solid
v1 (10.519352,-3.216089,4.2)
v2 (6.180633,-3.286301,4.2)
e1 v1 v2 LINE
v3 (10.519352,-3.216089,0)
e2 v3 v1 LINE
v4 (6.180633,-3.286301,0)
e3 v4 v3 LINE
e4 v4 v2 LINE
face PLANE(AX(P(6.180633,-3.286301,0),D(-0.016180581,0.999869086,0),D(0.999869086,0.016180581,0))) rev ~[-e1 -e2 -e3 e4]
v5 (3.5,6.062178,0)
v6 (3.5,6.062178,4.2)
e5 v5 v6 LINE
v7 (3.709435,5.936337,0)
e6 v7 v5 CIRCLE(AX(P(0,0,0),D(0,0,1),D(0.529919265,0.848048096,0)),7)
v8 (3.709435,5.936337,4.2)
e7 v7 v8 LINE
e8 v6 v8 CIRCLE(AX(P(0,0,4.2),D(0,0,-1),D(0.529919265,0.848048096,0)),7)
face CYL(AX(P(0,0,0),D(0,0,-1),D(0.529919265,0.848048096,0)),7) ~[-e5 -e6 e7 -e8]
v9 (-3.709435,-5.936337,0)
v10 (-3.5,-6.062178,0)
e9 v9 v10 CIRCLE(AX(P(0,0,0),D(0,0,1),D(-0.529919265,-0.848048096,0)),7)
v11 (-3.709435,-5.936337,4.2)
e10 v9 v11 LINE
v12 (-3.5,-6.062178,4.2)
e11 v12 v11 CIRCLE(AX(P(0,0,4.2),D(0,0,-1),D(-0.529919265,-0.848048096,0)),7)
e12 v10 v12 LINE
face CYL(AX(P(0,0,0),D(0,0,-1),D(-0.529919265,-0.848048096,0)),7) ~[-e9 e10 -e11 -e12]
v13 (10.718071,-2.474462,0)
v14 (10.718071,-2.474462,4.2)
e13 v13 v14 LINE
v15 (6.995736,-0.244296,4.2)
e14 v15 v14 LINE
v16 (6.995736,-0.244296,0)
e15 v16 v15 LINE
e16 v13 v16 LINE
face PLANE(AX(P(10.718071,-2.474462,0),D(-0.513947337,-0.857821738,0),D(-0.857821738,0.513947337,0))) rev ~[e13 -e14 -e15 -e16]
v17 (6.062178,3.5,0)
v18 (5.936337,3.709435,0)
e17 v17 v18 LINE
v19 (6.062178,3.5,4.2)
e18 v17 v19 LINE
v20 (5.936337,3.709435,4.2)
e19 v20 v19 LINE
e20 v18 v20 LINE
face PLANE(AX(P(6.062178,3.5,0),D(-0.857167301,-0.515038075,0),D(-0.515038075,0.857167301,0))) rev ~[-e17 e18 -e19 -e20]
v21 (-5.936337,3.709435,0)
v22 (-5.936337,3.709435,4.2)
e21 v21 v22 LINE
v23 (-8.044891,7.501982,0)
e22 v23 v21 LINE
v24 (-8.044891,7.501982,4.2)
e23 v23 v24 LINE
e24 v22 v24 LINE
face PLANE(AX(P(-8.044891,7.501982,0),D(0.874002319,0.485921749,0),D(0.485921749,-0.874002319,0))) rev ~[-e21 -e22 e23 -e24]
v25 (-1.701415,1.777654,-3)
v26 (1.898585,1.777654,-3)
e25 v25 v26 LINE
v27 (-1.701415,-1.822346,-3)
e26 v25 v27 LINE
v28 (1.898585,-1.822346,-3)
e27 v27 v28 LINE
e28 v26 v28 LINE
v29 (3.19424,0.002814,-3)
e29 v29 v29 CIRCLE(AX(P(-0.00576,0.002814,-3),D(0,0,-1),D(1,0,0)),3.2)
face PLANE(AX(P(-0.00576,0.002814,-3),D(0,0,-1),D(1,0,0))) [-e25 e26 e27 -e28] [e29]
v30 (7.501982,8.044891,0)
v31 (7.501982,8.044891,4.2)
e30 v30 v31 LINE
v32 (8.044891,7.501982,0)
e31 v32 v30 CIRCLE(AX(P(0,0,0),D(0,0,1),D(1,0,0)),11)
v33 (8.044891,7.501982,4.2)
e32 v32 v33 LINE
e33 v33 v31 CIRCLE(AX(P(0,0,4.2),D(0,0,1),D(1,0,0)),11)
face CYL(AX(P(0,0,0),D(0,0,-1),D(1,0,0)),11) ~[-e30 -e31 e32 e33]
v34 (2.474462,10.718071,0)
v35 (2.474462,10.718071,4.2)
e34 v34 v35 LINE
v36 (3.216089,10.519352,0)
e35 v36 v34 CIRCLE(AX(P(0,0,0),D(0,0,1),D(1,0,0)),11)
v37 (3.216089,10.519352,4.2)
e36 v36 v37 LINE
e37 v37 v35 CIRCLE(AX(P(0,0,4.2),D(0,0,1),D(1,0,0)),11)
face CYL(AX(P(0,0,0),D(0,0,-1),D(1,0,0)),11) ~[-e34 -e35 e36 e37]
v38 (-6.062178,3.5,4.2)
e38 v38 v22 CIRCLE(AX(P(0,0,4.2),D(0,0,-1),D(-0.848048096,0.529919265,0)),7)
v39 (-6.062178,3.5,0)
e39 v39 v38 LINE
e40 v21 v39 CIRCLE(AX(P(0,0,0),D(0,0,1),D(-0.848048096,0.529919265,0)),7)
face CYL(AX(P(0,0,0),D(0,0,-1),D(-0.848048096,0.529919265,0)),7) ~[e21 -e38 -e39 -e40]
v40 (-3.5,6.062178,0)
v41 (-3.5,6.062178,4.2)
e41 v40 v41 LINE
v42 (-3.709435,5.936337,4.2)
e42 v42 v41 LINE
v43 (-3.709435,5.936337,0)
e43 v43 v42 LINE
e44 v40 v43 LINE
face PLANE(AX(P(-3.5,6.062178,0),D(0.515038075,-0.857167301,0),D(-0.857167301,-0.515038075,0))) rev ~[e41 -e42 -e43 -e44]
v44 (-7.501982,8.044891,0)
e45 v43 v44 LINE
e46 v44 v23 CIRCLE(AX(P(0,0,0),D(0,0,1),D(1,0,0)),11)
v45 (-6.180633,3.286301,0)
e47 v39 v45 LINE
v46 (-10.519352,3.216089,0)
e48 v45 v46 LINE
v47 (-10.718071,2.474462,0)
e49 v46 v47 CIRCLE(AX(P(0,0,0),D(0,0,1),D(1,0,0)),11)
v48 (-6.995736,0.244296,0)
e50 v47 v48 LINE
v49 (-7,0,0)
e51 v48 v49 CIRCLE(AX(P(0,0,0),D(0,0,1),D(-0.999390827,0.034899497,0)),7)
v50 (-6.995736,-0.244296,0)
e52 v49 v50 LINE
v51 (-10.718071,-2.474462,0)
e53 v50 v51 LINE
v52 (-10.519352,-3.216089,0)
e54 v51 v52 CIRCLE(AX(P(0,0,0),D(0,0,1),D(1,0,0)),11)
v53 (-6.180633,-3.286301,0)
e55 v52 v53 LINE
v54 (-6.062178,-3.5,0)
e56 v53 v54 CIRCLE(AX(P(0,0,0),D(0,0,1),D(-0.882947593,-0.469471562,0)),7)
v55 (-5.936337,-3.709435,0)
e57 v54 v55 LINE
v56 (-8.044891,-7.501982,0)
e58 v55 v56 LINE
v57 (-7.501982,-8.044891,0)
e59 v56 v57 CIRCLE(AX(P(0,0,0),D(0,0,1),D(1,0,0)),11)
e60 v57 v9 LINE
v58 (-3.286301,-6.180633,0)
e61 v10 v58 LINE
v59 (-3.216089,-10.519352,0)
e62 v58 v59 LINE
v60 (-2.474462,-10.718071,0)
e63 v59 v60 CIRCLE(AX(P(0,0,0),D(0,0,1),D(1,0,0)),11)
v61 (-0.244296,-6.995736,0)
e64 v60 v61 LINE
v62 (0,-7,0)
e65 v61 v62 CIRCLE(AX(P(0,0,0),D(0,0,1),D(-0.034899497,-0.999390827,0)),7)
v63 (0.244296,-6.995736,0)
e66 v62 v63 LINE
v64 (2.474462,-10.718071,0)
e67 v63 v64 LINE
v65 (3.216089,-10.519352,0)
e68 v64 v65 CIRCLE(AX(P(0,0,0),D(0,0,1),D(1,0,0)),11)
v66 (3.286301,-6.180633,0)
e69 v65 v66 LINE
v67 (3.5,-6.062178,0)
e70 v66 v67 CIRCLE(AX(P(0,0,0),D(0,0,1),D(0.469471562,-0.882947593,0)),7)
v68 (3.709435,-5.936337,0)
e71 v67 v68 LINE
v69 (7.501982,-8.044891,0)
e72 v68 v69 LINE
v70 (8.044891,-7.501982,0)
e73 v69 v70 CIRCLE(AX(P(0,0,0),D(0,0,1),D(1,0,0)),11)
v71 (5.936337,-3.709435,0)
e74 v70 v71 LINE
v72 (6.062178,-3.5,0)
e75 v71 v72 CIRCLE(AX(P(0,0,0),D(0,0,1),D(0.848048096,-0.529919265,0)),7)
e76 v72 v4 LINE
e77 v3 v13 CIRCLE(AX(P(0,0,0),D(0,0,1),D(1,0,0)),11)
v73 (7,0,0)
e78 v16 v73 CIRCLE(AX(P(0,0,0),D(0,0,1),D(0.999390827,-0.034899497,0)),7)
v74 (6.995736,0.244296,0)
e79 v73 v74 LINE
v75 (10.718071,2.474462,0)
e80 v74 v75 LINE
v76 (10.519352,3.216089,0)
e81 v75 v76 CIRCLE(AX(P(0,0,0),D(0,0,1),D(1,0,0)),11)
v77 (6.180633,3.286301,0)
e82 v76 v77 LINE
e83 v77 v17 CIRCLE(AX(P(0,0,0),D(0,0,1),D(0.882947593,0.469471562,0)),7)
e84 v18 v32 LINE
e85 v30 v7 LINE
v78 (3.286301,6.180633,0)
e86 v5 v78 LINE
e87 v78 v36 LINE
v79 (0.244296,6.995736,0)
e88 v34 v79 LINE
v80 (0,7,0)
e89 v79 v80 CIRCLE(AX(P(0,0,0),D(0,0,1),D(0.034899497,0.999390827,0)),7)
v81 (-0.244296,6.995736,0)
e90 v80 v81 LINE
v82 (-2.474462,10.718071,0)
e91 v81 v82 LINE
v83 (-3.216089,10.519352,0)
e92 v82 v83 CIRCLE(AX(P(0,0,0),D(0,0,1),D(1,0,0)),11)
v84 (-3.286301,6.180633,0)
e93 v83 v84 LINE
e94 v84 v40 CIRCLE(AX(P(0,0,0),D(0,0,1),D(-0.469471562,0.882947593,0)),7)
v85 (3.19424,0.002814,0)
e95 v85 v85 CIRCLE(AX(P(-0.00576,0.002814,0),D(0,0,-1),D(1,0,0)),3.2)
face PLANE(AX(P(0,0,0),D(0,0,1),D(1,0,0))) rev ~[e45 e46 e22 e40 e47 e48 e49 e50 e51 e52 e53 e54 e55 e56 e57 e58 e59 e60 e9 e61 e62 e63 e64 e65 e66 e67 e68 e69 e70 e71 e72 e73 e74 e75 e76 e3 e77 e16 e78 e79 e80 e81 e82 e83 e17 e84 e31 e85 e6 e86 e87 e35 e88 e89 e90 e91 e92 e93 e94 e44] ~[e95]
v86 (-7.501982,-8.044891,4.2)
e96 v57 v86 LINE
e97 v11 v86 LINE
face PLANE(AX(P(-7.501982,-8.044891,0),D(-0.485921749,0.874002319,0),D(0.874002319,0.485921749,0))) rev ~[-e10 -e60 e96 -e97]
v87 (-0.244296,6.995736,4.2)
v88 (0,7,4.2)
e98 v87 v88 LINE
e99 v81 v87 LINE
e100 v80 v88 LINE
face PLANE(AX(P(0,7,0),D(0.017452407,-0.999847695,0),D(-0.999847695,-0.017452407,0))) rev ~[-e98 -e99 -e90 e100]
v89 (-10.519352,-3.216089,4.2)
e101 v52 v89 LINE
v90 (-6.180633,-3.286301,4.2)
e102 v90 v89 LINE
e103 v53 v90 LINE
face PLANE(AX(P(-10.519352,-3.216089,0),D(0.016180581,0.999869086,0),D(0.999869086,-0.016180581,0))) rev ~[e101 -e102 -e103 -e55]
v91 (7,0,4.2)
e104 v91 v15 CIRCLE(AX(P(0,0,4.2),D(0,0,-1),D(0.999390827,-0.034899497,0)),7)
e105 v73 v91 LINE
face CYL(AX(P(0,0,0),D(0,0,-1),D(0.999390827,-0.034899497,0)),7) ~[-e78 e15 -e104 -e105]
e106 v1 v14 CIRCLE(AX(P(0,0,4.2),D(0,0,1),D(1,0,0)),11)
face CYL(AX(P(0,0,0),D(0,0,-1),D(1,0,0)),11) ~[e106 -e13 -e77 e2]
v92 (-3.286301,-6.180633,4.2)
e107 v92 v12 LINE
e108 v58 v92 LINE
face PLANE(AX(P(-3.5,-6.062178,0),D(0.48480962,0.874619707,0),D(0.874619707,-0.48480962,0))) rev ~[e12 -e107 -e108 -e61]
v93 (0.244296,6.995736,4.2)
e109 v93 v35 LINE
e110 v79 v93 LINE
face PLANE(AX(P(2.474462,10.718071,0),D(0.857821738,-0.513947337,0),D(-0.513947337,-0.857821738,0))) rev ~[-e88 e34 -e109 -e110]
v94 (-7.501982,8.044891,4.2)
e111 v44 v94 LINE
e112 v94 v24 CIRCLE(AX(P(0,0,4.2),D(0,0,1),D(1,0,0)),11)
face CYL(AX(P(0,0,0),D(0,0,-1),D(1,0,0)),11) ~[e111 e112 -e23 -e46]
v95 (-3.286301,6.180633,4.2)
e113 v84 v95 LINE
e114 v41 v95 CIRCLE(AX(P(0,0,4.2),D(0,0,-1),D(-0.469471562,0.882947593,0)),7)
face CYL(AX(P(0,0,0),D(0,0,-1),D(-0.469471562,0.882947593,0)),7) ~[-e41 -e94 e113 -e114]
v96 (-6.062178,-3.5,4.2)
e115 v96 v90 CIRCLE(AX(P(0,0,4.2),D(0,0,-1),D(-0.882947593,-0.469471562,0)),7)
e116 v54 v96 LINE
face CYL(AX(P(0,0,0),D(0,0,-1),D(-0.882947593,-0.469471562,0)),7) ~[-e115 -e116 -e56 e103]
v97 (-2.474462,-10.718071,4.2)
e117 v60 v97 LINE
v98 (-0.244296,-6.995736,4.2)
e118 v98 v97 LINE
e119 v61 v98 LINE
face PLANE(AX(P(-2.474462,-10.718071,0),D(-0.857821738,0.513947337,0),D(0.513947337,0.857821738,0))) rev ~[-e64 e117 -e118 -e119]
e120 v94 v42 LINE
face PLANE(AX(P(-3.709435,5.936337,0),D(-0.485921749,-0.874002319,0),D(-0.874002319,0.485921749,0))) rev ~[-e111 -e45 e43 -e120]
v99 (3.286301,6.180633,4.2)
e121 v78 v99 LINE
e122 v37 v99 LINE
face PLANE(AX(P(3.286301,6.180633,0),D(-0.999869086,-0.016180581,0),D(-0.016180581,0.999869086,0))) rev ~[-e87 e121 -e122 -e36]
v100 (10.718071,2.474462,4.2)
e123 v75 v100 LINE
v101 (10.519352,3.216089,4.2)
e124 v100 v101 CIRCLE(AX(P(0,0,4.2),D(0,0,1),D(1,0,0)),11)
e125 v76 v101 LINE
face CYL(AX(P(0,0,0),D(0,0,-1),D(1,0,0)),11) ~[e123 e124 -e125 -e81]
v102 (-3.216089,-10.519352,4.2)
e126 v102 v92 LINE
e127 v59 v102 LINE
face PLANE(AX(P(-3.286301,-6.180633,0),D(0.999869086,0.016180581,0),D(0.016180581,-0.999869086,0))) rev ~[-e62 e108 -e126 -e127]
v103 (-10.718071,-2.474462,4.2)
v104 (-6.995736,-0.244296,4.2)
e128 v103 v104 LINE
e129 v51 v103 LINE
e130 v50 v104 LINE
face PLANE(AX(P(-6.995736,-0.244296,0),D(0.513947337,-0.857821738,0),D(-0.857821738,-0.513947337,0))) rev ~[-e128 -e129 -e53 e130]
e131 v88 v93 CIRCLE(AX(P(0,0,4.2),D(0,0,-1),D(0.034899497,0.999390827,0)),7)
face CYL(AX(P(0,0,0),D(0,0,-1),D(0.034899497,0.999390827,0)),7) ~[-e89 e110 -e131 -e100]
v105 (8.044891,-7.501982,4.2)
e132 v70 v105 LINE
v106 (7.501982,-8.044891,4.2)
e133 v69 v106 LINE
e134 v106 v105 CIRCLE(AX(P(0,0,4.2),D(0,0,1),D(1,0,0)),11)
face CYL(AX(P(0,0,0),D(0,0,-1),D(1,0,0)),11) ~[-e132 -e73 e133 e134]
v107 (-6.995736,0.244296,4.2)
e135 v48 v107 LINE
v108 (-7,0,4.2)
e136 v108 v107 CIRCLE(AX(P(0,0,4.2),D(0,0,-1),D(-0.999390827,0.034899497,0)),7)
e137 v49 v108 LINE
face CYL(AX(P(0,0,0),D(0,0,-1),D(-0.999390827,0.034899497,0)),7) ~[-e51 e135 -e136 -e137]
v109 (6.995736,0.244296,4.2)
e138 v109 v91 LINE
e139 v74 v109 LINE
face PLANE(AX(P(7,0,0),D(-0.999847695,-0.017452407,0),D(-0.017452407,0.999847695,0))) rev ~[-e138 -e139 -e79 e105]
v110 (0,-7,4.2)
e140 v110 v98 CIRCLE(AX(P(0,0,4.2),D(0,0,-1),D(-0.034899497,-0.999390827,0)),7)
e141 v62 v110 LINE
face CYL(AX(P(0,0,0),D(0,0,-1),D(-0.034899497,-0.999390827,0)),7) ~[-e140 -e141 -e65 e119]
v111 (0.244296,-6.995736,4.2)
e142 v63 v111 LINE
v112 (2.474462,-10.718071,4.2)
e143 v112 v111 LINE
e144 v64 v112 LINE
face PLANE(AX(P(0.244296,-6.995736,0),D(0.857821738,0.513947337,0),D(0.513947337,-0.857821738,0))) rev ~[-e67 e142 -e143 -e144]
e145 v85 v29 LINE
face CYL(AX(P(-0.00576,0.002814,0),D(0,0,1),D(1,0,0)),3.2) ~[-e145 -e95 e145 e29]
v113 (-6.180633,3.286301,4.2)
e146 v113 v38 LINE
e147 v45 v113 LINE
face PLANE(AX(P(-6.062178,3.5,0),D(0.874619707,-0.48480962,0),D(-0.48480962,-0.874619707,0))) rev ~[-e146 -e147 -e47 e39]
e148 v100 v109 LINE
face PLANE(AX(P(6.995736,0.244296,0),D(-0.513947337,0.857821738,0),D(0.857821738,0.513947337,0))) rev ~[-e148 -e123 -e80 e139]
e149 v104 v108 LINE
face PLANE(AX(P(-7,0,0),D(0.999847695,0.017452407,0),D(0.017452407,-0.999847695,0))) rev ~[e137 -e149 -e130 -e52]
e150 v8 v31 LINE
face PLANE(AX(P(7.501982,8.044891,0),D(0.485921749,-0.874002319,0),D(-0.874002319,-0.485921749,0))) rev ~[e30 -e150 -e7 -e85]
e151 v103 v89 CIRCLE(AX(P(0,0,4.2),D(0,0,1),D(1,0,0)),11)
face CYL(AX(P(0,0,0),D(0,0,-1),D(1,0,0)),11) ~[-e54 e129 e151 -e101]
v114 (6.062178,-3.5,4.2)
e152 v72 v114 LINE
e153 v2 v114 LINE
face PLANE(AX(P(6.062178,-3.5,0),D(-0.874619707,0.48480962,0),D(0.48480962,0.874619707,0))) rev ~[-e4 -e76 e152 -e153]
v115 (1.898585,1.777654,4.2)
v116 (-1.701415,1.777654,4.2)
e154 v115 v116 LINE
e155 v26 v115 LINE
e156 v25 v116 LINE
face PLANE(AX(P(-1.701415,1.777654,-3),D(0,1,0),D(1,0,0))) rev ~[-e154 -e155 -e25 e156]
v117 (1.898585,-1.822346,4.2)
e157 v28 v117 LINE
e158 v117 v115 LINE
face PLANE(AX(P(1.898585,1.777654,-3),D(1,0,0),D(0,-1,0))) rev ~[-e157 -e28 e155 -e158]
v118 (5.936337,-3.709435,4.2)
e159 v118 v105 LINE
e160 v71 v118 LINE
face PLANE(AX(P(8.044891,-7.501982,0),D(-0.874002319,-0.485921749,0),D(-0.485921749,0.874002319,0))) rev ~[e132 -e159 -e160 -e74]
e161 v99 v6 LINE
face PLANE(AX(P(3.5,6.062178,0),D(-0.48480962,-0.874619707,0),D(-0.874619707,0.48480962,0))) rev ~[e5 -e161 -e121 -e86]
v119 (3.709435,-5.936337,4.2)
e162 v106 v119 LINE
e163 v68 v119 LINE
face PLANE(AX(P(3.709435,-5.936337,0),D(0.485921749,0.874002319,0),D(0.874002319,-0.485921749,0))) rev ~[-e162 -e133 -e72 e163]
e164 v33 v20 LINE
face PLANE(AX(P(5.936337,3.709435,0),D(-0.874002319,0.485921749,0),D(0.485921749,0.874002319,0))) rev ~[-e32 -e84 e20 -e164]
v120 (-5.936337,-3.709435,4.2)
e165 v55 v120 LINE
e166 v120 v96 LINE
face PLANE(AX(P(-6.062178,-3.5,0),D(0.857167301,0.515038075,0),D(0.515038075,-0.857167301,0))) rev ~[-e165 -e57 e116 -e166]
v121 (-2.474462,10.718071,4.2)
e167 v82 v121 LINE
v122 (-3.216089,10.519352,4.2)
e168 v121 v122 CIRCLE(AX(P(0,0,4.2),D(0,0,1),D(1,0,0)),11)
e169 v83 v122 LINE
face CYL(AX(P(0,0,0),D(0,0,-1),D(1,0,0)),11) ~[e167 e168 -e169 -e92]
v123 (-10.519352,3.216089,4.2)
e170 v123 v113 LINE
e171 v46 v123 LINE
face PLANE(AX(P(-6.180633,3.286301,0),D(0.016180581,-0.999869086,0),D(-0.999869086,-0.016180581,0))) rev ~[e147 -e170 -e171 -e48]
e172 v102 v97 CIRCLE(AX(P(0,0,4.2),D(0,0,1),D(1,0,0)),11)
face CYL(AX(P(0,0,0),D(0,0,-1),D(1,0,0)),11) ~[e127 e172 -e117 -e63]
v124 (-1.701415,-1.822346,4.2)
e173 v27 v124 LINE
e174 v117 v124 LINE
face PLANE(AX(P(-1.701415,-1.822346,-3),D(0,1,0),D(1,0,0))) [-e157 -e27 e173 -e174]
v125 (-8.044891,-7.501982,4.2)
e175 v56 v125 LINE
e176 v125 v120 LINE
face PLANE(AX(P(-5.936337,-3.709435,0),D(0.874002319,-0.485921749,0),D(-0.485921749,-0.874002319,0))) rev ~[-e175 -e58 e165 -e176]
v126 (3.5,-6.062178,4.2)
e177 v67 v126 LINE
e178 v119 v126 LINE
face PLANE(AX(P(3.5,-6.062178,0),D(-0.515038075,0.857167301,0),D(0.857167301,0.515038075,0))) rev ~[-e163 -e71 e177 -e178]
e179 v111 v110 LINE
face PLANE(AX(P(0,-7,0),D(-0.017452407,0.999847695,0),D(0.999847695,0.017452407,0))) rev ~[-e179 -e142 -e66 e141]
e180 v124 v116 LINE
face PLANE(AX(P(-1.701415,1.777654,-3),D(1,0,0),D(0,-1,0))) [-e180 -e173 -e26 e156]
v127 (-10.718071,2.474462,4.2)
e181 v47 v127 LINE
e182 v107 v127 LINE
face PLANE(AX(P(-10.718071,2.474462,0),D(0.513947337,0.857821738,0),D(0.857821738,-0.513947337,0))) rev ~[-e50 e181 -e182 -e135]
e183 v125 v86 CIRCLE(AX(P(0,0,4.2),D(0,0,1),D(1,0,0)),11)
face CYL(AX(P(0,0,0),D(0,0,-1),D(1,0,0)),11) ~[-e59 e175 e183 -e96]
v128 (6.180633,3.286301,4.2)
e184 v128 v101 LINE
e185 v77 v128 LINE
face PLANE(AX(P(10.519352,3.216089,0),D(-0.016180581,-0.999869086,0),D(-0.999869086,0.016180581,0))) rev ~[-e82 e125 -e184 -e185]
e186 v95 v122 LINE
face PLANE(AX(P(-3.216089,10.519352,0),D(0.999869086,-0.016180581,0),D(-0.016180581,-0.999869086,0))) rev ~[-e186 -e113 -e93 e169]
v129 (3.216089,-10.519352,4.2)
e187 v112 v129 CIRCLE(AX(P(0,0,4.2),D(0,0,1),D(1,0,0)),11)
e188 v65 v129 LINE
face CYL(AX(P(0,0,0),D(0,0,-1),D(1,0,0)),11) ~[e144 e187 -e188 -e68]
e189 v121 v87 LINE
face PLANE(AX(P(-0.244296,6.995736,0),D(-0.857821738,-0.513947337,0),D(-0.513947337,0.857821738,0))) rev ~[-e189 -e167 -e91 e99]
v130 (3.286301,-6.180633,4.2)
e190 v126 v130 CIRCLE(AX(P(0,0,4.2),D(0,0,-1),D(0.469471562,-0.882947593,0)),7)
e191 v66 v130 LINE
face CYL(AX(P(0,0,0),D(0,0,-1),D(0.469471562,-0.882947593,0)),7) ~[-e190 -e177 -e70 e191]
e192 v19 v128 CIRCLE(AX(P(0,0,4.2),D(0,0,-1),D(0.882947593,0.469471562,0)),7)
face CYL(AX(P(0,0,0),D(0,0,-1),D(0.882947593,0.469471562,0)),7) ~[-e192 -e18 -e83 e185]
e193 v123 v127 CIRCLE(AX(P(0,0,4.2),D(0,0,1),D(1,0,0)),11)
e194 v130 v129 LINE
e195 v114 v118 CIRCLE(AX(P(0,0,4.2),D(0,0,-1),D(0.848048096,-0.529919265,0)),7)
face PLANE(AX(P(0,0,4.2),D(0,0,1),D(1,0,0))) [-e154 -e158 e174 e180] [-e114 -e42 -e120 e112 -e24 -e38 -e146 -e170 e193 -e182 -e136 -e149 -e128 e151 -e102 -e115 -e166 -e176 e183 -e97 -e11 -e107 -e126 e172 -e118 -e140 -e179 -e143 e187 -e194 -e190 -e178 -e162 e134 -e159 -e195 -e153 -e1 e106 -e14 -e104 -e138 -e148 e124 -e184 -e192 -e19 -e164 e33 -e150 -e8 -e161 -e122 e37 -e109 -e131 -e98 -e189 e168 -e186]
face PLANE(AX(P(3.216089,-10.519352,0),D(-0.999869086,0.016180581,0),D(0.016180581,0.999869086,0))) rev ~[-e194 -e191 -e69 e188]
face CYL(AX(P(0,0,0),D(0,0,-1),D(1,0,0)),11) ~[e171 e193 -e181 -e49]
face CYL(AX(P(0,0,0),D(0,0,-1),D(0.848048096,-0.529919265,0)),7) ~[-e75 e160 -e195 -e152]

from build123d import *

# Parameters (mm, degrees)
F0_R            = 11
F1_DEPTH        = 4.2
F3_DEPTH        = 4.201
F3_COPIES_COUNT = 12
F5_R            = 3.2
F6_DEPTH        = 3
F7_W            = 3.6
F7_H            = 3.6
F8_DEPTH        = 7.201


# Not quite as in the source:
# - a pattern or mirror of a feature is missing from the dataset's text; its kind, count and spacing are read off the source's solid


with BuildPart() as f1:
    # F0 (on Top) → F1 (new body)
    with BuildSketch(Plane.XY):
        Circle(F0_R)
    extrude(amount=F1_DEPTH)

    # F2 (on face) → F3 (cut, through all)
    with BuildSketch(Plane(origin=(0, 0, 0), x_dir=(1, 0, 0), z_dir=(0, 0, -1))):
        with BuildLine():
            ThreePointArc((6.9957357891, 0.2442964769), (6.9989338661, 0.1221668451), (7, 0))
            Line((7, 0), (8.3441911265, 0))
            Line((8.3441911265, 0), (11, 0))
            ThreePointArc((11, 0), (10.9292904124, 1.2452353514), (10.7180707126, 2.4744615978))
            Line((10.7180707126, 2.4744615978), (6.9957357891, 0.2442964769))
        make_face()
        with BuildLine():
            Line((8.3441911265, 0), (7, 0))
            Line((7, 0), (6.9957357891, -0.2442964769))
            Line((6.9957357891, -0.2442964769), (10.7180707126, -2.4744615978))
            ThreePointArc((10.7180707126, -2.4744615978), (10.9292904124, -1.2452353514), (11, 0))
            Line((11, 0), (8.3441911265, 0))
        make_face()
    f3 = extrude(amount=-F3_DEPTH, mode=Mode.SUBTRACT)

    # F3_copies: F3 ×12 about axis
    f3_copies_axis = Axis((0, 0, 0), (0, 0, 1))
    for i in range(1, F3_COPIES_COUNT):
        add(f3.rotate(f3_copies_axis, i * 360 / F3_COPIES_COUNT), mode=Mode.SUBTRACT)

    # F5 (on face) → F6 (join)
    with BuildSketch(Plane(origin=(0, 0, 0), x_dir=(1, 0, 0), z_dir=(0, 0, -1))):
        with Locations((-0.0057600341, -0.0028142263)):
            Circle(F5_R)
    extrude(amount=F6_DEPTH)

    # F7 (on face) → F8 (cut, through all)
    with BuildSketch(Plane(origin=(0, 0, -3), x_dir=(1, 0, 0), z_dir=(0, 0, -1))):
        with Locations((0.0985847846, 0.0223461993)):
            Rectangle(F7_W, F7_H)
    extrude(amount=-F8_DEPTH, mode=Mode.SUBTRACT)


solid = f1.part
